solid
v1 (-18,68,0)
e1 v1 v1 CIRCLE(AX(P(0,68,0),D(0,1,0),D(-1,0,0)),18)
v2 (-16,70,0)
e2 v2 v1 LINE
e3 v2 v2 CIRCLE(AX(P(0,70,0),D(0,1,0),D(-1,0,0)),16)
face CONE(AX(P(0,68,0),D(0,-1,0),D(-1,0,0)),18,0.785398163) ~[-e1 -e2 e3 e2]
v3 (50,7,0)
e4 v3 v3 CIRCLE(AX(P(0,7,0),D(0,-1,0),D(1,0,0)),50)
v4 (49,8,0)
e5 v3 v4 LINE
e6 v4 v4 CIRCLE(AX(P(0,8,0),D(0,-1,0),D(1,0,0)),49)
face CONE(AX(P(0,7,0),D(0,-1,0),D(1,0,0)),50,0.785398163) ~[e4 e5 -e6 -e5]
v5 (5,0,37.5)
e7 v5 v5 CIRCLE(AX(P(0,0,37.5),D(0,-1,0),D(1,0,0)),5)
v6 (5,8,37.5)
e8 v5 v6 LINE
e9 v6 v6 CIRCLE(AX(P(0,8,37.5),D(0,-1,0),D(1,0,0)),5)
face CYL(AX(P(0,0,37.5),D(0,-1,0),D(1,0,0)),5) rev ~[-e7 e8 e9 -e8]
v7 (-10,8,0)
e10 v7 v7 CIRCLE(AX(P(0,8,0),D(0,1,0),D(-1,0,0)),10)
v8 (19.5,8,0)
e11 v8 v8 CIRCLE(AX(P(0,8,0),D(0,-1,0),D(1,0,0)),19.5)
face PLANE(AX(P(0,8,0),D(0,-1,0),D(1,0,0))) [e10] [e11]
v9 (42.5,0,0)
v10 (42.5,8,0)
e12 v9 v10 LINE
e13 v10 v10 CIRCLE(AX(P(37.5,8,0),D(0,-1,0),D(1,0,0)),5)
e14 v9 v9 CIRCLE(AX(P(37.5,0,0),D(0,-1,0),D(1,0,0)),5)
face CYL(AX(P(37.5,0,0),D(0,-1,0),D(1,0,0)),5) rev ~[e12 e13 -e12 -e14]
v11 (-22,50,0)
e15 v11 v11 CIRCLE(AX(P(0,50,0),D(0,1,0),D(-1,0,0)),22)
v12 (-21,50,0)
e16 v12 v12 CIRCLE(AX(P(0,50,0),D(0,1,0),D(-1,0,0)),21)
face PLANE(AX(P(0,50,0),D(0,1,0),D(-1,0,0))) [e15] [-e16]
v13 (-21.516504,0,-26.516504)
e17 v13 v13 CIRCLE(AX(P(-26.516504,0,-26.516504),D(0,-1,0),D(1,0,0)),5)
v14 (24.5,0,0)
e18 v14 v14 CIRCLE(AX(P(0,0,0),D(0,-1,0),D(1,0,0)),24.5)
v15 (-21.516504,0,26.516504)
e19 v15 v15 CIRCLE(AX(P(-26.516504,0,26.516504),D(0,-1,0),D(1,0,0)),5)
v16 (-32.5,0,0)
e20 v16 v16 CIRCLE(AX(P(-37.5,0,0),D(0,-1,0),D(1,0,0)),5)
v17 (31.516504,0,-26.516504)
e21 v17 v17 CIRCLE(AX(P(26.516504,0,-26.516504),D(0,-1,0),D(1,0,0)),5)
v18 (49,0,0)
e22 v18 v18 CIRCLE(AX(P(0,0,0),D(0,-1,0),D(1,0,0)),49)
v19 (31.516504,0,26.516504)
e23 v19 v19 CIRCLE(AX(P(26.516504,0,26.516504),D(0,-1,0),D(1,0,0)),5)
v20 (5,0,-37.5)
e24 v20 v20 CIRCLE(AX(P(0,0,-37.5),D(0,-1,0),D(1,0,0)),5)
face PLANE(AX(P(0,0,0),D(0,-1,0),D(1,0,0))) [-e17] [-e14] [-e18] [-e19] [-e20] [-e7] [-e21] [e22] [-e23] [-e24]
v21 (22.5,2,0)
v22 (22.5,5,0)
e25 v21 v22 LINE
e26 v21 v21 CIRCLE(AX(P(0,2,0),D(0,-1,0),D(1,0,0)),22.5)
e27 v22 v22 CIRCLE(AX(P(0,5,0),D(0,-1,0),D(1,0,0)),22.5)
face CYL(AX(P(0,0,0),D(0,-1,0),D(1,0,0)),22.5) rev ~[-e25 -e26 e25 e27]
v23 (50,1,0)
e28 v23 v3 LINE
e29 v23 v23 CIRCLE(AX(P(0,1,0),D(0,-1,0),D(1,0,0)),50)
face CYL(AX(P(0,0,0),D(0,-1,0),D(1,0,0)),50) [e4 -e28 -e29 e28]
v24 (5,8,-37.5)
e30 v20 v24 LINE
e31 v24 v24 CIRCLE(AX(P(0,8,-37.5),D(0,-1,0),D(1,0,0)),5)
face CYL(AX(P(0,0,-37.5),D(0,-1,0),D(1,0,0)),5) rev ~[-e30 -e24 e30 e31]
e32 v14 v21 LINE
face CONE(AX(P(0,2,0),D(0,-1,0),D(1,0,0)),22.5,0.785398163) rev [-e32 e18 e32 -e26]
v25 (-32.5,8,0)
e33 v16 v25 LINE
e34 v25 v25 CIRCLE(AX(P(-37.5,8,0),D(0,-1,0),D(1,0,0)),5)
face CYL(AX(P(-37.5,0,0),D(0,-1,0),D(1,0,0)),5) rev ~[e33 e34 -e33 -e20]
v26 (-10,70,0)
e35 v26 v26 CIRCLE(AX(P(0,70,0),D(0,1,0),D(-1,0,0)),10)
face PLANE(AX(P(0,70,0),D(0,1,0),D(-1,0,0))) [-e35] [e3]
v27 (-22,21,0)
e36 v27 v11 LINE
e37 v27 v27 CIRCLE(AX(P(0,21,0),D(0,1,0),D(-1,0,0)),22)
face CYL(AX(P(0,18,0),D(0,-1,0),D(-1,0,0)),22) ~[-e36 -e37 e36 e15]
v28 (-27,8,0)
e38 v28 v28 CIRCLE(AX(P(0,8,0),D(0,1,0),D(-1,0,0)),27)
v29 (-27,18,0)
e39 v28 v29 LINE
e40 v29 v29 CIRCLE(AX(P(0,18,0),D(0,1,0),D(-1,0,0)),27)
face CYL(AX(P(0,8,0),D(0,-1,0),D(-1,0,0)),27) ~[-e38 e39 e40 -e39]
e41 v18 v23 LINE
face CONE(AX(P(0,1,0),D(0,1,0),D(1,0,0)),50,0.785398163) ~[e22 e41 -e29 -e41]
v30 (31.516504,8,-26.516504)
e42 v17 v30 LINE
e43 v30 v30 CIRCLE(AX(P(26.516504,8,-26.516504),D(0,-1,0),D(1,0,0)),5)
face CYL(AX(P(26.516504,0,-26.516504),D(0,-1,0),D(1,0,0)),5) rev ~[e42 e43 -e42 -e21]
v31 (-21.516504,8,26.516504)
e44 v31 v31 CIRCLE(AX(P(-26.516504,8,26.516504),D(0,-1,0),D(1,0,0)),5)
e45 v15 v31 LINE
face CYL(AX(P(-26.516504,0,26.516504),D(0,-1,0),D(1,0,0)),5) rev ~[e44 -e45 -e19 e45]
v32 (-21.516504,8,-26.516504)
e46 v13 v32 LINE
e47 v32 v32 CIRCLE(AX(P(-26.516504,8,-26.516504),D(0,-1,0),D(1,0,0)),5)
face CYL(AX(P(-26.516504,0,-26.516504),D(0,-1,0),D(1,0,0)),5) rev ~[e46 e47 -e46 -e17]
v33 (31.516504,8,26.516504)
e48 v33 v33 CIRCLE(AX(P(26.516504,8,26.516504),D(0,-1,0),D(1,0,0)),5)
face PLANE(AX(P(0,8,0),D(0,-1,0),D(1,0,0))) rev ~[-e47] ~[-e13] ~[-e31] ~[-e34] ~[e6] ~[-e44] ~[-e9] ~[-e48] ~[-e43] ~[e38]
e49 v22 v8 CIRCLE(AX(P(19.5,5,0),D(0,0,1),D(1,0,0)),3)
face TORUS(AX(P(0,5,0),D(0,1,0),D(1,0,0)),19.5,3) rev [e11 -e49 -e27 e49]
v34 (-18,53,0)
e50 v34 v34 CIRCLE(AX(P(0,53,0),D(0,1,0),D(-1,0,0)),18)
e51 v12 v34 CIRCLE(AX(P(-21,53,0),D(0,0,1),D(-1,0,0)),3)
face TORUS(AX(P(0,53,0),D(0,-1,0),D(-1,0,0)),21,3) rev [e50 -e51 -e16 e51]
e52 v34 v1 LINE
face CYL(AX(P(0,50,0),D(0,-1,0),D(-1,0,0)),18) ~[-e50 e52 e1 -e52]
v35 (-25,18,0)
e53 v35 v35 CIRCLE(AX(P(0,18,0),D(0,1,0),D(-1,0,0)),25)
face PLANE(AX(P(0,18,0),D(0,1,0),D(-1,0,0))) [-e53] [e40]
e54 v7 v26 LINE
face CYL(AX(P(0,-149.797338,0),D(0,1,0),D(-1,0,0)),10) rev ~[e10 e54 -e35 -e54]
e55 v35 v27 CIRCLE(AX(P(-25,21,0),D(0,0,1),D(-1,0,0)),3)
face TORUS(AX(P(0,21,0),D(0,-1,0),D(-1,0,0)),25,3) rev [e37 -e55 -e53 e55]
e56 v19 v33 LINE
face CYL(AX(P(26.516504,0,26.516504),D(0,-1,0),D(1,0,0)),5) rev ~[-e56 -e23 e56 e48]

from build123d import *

# Parameters (mm, degrees)
F0_R     = 50
F0_R_2   = 5
F1_DEPTH = 8
F2_R     = 27
F3_DEPTH = 10
F4_R     = 22
F5_DEPTH = 32
F6_R     = 18
F7_DEPTH = 20
F8_R     = 22.5
F9_DEPTH = 8
F11_D    = 20
F12_SIZE = 2
F13_R    = 3
F14_SIZE = 1


with BuildPart() as f1:
    # F0 (on Front) → F1 (new body)
    with BuildSketch(Plane.XZ):
        Circle(F0_R)
        with Locations((-26.5165042945, -26.5165042945)):
            Circle(F0_R_2, mode=Mode.SUBTRACT)
        with Locations((0, -37.5)):
            Circle(F0_R_2, mode=Mode.SUBTRACT)
        with Locations((26.5165042945, -26.5165042945)):
            Circle(F0_R_2, mode=Mode.SUBTRACT)
        with Locations((-37.5, 0)):
            Circle(F0_R_2, mode=Mode.SUBTRACT)
        with Locations((-26.5165042945, 26.5165042945)):
            Circle(F0_R_2, mode=Mode.SUBTRACT)
        with Locations((37.5, 0)):
            Circle(F0_R_2, mode=Mode.SUBTRACT)
        with Locations((0, 37.5)):
            Circle(F0_R_2, mode=Mode.SUBTRACT)
        with Locations((26.5165042945, 26.5165042945)):
            Circle(F0_R_2, mode=Mode.SUBTRACT)
    extrude(amount=-F1_DEPTH)

    # F2 (on face) → F3 (join)
    with BuildSketch(Plane(origin=(0, 8, 0), x_dir=(-1, 0, 0), z_dir=(0, 1, 0))):
        Circle(F2_R)
    extrude(amount=F3_DEPTH)

    # F4 (on face) → F5 (join)
    with BuildSketch(Plane(origin=(0, 18, 0), x_dir=(-1, 0, 0), z_dir=(0, 1, 0))):
        Circle(F4_R)
    extrude(amount=F5_DEPTH)

    # F6 (on face) → F7 (join)
    with BuildSketch(Plane(origin=(0, 50, 0), x_dir=(-1, 0, 0), z_dir=(0, 1, 0))):
        Circle(F6_R)
    extrude(amount=F7_DEPTH)

    # F8 (on face) → F9 (cut)
    with BuildSketch(Plane.XZ):
        Circle(F8_R)
    extrude(amount=-F9_DEPTH, mode=Mode.SUBTRACT)

    # F11 (through all)
    with Locations(Plane.XZ.offset(-8)):
        with Locations((0, 0)):
            Hole(F11_D / 2)

    # F12
    f12_edges = [f1.edges().sort_by_distance(p)[0] for p in [
        (-22.5, 0, 0),
        (18, 70, 0),
    ]]
    chamfer(f12_edges, length=F12_SIZE)

    # F13
    f13_edges = [f1.edges().sort_by_distance(p)[0] for p in [
        (-22.5, 8, 0),
        (22, 18, 0),
        (18, 50, 0),
    ]]
    fillet(f13_edges, radius=F13_R)

    # F14
    f14_edges = [f1.edges().sort_by_distance(p)[0] for p in [
        (-50, 0, 0),
        (-50, 8, 0),
    ]]
    chamfer(f14_edges, length=F14_SIZE)


solid = f1.part
